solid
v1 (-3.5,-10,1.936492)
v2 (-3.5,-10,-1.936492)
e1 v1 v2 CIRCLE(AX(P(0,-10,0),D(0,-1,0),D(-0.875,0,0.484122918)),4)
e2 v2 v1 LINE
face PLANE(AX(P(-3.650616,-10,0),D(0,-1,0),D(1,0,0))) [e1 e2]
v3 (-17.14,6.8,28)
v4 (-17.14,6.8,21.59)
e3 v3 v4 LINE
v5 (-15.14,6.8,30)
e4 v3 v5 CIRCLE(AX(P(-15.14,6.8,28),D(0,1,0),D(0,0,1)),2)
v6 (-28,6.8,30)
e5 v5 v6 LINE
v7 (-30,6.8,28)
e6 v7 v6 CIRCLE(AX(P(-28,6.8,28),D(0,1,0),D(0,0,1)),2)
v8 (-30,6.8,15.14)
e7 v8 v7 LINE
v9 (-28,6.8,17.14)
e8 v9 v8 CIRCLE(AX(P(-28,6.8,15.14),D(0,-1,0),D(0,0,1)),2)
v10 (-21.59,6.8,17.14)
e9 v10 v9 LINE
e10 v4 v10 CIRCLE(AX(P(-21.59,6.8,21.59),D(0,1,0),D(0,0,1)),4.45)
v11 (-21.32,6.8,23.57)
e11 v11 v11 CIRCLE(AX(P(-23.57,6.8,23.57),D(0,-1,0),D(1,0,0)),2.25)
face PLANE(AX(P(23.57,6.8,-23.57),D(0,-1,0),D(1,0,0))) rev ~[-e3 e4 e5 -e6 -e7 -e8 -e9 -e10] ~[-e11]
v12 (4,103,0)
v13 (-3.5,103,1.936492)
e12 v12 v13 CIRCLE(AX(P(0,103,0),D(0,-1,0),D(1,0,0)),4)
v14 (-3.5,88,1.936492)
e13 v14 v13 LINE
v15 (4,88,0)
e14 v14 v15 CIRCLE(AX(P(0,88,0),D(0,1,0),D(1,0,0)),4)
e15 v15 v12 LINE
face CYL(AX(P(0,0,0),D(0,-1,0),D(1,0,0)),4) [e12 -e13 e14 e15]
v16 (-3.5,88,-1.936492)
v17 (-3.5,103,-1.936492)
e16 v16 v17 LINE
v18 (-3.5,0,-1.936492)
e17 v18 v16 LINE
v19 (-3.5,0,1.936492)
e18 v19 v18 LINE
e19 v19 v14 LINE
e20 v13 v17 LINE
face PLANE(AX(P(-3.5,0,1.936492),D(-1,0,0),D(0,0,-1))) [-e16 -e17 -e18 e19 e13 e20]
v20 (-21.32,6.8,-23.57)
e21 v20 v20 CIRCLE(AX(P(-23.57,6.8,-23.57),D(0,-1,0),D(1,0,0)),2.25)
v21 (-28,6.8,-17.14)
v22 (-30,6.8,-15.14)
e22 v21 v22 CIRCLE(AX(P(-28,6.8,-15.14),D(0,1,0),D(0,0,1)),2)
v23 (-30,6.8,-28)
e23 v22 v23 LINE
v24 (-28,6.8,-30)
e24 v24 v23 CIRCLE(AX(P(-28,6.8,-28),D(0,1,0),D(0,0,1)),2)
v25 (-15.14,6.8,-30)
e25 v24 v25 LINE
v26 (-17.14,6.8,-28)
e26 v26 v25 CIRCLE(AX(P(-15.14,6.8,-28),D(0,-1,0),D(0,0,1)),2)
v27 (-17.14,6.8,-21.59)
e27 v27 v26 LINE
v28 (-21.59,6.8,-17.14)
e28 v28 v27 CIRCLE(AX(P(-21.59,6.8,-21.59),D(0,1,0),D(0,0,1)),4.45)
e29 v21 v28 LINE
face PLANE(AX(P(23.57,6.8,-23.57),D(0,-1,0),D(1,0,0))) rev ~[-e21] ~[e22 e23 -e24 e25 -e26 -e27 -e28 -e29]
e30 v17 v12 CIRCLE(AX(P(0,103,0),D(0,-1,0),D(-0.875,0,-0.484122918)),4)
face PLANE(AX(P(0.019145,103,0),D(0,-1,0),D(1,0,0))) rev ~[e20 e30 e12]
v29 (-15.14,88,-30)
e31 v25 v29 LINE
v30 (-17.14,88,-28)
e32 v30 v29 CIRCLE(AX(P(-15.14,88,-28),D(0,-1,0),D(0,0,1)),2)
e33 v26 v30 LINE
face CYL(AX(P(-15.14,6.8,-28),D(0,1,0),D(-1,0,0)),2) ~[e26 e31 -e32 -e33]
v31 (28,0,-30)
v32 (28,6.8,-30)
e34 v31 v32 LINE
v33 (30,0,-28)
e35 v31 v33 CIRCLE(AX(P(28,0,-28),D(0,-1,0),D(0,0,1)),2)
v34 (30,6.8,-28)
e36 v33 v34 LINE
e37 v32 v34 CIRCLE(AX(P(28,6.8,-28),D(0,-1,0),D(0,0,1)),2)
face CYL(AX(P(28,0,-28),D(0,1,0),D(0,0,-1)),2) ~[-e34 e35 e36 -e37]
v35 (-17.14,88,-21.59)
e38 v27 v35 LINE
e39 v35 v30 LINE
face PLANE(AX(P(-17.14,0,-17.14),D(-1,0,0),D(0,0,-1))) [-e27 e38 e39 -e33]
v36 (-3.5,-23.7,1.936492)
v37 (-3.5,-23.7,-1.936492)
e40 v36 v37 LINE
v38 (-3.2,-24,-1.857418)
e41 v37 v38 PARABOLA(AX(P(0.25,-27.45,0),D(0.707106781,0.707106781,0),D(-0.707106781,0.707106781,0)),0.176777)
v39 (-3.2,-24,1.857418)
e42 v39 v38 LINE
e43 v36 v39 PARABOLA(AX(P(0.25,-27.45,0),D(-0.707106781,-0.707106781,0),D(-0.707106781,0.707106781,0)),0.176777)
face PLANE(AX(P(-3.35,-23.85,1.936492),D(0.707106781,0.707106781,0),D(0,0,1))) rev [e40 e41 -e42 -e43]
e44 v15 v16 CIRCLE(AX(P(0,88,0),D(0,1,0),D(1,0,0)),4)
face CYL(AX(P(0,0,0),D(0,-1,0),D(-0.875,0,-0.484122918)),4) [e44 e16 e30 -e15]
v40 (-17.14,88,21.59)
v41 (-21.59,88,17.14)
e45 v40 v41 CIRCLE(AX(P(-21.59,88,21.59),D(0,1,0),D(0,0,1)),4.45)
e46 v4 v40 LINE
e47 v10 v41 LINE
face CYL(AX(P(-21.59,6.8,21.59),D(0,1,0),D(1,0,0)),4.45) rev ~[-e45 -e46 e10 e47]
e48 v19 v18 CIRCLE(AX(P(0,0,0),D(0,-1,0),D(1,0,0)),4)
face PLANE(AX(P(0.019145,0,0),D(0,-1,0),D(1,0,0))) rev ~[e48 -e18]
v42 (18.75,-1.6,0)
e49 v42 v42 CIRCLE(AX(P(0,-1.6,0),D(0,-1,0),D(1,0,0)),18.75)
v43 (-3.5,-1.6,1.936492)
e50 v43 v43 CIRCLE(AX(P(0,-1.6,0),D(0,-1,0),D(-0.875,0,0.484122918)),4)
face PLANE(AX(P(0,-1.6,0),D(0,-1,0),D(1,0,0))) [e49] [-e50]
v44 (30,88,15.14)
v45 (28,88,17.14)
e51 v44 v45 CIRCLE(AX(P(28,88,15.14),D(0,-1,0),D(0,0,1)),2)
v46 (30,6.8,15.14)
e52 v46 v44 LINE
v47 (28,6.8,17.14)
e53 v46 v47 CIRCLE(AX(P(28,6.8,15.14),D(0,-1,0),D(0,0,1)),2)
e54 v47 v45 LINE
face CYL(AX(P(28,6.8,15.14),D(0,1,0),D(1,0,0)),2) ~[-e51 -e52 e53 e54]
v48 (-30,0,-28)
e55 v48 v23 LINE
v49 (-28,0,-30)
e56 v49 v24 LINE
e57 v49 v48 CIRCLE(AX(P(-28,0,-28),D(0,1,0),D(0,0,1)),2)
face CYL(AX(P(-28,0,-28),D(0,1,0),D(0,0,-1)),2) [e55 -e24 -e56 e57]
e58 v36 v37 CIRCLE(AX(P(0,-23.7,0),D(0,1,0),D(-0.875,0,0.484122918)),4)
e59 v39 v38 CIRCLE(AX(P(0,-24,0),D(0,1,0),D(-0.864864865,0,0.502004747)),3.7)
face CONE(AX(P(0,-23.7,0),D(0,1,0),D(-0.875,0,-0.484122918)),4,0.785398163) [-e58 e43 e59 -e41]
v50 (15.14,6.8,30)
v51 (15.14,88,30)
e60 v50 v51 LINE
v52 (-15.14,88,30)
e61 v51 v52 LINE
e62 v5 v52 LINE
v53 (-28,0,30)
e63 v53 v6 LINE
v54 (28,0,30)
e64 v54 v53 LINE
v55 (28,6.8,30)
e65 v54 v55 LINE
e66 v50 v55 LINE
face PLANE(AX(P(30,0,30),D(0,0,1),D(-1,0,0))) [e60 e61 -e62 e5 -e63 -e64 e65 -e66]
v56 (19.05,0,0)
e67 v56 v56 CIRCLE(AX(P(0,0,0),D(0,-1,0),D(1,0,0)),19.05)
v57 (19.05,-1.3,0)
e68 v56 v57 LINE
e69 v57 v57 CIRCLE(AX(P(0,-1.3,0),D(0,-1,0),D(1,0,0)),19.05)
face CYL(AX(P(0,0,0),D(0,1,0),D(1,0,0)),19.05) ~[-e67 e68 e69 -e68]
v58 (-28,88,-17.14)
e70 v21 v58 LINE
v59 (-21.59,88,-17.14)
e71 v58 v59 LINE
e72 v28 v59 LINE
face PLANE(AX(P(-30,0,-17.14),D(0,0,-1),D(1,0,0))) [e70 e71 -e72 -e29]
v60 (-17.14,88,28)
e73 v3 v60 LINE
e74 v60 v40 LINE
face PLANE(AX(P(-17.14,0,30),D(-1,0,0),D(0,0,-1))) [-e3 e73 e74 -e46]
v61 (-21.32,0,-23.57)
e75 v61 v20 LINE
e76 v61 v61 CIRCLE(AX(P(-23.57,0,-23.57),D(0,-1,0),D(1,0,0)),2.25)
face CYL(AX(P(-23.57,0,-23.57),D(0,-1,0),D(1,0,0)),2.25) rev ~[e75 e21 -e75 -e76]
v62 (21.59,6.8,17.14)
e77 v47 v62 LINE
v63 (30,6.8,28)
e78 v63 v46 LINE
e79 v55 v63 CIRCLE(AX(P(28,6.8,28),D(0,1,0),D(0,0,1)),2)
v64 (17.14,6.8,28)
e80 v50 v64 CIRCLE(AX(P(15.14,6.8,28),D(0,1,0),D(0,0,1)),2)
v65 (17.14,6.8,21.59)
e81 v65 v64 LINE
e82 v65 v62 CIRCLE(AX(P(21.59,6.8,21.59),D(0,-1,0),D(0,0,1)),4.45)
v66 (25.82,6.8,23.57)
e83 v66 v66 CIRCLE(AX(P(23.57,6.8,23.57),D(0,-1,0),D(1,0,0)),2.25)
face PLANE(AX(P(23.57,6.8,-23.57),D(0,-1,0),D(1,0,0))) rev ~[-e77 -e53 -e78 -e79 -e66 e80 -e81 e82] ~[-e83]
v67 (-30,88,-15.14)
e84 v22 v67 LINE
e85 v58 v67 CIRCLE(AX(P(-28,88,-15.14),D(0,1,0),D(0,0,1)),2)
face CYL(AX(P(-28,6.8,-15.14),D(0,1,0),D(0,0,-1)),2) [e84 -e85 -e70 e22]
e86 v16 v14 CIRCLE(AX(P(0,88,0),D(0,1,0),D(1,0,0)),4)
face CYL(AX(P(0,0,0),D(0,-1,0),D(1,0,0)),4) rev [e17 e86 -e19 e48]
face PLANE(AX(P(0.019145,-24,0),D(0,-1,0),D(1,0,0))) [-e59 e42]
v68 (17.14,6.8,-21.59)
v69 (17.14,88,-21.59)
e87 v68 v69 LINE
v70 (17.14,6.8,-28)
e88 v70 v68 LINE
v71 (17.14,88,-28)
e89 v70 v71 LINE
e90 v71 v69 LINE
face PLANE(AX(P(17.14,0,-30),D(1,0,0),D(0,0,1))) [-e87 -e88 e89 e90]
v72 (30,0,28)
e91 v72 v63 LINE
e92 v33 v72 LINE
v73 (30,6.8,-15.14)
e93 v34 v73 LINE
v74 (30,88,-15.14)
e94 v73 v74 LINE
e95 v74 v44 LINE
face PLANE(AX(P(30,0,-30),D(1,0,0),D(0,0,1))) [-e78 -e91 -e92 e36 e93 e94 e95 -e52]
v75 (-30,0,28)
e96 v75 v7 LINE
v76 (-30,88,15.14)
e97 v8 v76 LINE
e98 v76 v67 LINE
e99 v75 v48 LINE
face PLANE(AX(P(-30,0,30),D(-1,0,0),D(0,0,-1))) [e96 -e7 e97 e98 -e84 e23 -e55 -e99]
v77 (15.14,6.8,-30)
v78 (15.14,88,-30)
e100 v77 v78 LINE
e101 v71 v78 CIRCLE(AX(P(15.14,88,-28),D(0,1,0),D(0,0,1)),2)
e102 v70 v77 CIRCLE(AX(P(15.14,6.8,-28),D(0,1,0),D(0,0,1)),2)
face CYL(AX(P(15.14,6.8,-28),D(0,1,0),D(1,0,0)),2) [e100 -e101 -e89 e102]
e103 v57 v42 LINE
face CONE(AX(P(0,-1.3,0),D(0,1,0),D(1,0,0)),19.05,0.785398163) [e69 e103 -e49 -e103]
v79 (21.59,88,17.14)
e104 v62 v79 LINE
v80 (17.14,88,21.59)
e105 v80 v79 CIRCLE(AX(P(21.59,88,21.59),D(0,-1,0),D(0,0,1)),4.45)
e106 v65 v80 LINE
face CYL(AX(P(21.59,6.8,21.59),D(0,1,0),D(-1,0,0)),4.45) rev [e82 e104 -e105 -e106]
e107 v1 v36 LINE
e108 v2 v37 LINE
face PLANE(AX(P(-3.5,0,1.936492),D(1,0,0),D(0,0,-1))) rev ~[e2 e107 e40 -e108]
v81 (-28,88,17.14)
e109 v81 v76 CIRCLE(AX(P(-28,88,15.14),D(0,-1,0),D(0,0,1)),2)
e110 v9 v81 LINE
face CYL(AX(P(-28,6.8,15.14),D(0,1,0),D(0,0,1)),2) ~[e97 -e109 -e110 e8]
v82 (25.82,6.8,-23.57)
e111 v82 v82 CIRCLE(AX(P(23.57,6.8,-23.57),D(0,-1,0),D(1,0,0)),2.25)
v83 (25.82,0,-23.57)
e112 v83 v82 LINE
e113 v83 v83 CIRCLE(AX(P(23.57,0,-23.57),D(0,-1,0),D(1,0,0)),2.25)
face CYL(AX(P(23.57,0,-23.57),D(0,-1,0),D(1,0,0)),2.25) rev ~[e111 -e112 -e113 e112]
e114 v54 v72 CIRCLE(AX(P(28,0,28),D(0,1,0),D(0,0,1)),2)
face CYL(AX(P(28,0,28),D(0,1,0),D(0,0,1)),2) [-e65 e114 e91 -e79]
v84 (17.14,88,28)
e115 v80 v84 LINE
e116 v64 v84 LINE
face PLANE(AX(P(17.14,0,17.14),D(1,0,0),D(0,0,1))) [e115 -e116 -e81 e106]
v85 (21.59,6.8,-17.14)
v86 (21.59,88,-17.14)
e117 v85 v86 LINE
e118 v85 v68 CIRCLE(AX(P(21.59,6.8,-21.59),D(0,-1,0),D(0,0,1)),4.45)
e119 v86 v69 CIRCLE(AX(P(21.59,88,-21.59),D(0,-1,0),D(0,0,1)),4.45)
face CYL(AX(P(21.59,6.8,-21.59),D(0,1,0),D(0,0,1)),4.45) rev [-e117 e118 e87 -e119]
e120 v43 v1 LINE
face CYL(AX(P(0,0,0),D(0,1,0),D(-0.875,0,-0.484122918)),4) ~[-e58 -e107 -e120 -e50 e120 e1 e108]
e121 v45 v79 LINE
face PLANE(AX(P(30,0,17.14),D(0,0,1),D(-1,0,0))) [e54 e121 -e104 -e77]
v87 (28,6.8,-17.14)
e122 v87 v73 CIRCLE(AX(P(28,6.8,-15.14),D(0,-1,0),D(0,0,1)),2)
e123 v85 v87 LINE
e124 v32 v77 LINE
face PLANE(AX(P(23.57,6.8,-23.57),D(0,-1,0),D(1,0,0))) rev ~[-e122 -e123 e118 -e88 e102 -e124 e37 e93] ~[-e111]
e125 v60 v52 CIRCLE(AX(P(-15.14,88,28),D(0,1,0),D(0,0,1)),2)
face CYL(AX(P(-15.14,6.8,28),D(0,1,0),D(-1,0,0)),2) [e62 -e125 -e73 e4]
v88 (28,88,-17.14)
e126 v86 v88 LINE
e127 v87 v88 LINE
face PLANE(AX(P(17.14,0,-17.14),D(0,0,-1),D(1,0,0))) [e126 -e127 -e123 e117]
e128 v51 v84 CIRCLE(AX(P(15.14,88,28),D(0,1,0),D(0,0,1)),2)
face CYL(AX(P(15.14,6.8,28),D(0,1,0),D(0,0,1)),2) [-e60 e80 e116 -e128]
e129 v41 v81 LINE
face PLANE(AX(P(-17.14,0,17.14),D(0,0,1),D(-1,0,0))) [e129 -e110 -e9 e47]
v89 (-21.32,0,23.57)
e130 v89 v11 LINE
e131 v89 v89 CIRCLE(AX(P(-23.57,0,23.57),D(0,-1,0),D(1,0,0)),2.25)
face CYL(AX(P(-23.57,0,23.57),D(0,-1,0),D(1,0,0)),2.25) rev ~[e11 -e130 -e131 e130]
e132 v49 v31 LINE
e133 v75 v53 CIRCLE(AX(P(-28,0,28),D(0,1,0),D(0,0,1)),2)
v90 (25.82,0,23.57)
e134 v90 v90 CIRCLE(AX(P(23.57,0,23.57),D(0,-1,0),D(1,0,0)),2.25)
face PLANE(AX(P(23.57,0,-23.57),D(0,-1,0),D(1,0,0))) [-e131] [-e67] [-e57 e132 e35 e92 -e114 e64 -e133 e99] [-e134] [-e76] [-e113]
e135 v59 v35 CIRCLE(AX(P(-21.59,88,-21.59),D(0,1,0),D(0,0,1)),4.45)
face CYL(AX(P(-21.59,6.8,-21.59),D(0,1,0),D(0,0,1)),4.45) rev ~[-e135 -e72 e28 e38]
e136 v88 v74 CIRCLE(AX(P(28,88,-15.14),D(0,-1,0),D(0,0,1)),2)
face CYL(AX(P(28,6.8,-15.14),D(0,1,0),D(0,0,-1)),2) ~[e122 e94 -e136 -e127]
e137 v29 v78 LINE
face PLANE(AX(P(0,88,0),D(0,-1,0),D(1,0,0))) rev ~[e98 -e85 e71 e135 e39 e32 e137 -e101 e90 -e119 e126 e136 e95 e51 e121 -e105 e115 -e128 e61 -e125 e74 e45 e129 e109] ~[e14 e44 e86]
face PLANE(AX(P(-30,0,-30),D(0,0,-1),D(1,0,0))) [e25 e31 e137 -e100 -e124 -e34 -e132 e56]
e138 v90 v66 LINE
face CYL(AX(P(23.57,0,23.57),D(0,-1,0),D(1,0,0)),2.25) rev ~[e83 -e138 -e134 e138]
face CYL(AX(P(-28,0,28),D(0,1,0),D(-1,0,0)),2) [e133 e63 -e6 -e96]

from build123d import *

# Parameters (mm, degrees)
F0_W     = 12.86
F0_H     = 12.86
F0_R     = 2.25
F0_R_2   = 19.05
F1_DEPTH = 6.8
F2_DEPTH = 1.6
F3_DEPTH = 88
F4_R     = 4.45
F5_R     = 2
F6_DEPTH = 10
F7_DEPTH = 24
F8_DEPTH = 103
F9_SIZE  = 0.3


with BuildPart() as f1:
    # F0 (on Front) → F1 (new body)
    with BuildSketch(Plane.XZ):
        with Locations((23.57, -23.57)):
            Rectangle(F0_W, F0_H)
        with Locations((23.57, -23.57)):
            Circle(F0_R, mode=Mode.SUBTRACT)
        Polygon((-17.14, -30), (17.14, -30), (17.14, -17.14), (30, -17.14), (30, 17.14), (17.14, 17.14), (17.14, 30), (-17.14, 30), (-17.14, 17.14), (-30, 17.14), (-30, -17.14), (-17.14, -17.14), align=None)
        Circle(F0_R_2, mode=Mode.SUBTRACT)
        with Locations((-23.57, -23.57)):
            Rectangle(F0_W, F0_H)
        with Locations((-23.57, -23.57)):
            Circle(F0_R, mode=Mode.SUBTRACT)
        with Locations((23.57, 23.57)):
            Rectangle(F0_W, F0_H)
        with Locations((23.57, 23.57)):
            Circle(F0_R, mode=Mode.SUBTRACT)
        with Locations((-23.57, 23.57)):
            Rectangle(F0_W, F0_H)
        with Locations((-23.57, 23.57)):
            Circle(F0_R, mode=Mode.SUBTRACT)
        Circle(F0_R_2)
        with BuildLine():
            ThreePointArc((-3.5, 1.9364916731), (1, 3.8729833462), (4, 0))
            ThreePointArc((4, 0), (1, -3.8729833462), (-3.5, -1.9364916731))
            ThreePointArc((-3.5, -1.9364916731), (-4, 0), (-3.5, 1.9364916731))
        make_face(mode=Mode.SUBTRACT)
    extrude(amount=-F1_DEPTH)

    # F0 (on Front) → F2 (join)
    with BuildSketch(Plane.XZ):
        Circle(F0_R_2)
        with BuildLine():
            ThreePointArc((-3.5, 1.9364916731), (1, 3.8729833462), (4, 0))
            ThreePointArc((4, 0), (1, -3.8729833462), (-3.5, -1.9364916731))
            ThreePointArc((-3.5, -1.9364916731), (-4, 0), (-3.5, 1.9364916731))
        make_face(mode=Mode.SUBTRACT)
    extrude(amount=F2_DEPTH)

    # F0 (on Front) → F3 (join)
    with BuildSketch(Plane.XZ):
        Polygon((-17.14, -30), (17.14, -30), (17.14, -17.14), (30, -17.14), (30, 17.14), (17.14, 17.14), (17.14, 30), (-17.14, 30), (-17.14, 17.14), (-30, 17.14), (-30, -17.14), (-17.14, -17.14), align=None)
        Circle(F0_R_2, mode=Mode.SUBTRACT)
        Circle(F0_R_2)
        with BuildLine():
            ThreePointArc((-3.5, 1.9364916731), (1, 3.8729833462), (4, 0))
            ThreePointArc((4, 0), (1, -3.8729833462), (-3.5, -1.9364916731))
            ThreePointArc((-3.5, -1.9364916731), (-4, 0), (-3.5, 1.9364916731))
        make_face(mode=Mode.SUBTRACT)
    extrude(amount=-F3_DEPTH)

    # F4
    f4_edges = [f1.edges().sort_by_distance(p)[0] for p in [
        (17.14, 47.4, 17.14),
        (17.14, 47.4, -17.14),
        (-17.14, 47.4, 17.14),
        (-17.14, 47.4, -17.14),
    ]]
    fillet(f4_edges, radius=F4_R)

    # F5
    f5_edges = [f1.edges().sort_by_distance(p)[0] for p in [
        (-30, 3.4, 30),
        (30, 3.4, 30),
        (-17.14, 47.4, 30),
        (-30, 47.4, 17.14),
        (17.14, 47.4, 30),
        (-30, 3.4, -30),
        (30, 3.4, -30),
        (30, 47.4, 17.14),
        (30, 47.4, -17.14),
        (17.14, 47.4, -30),
        (-17.14, 47.4, -30),
        (-30, 47.4, -17.14),
    ]]
    fillet(f5_edges, radius=F5_R)

    # F0 (on Front) → F6 (join)
    with BuildSketch(Plane.XZ):
        with BuildLine():
            Line((-3.5, -1.9364916731), (-3.5, 1.9364916731))
            ThreePointArc((-3.5, 1.9364916731), (-4, 0), (-3.5, -1.9364916731))
        make_face()
    extrude(amount=F6_DEPTH)

    # F0 (on Front) → F7 (join)
    with BuildSketch(Plane.XZ):
        with BuildLine():
            ThreePointArc((-3.5, -1.9364916731), (1, -3.8729833462), (4, 0))
            ThreePointArc((4, 0), (1, 3.8729833462), (-3.5, 1.9364916731))
            Line((-3.5, 1.9364916731), (-3.5, -1.9364916731))
        make_face()
    extrude(amount=F7_DEPTH)

    # F0 (on Front) → F8 (join)
    with BuildSketch(Plane.XZ):
        with BuildLine():
            ThreePointArc((-3.5, -1.9364916731), (1, -3.8729833462), (4, 0))
            ThreePointArc((4, 0), (1, 3.8729833462), (-3.5, 1.9364916731))
            Line((-3.5, 1.9364916731), (-3.5, -1.9364916731))
        make_face()
    extrude(amount=-F8_DEPTH)

    # F9
    f9_edges = [f1.edges().sort_by_distance(p)[0] for p in [
        (4, -24, 0),
        (-3.5, -24, 0),
        (-19.05, -1.6, 0),
    ]]
    chamfer(f9_edges, length=F9_SIZE)


solid = f1.part
